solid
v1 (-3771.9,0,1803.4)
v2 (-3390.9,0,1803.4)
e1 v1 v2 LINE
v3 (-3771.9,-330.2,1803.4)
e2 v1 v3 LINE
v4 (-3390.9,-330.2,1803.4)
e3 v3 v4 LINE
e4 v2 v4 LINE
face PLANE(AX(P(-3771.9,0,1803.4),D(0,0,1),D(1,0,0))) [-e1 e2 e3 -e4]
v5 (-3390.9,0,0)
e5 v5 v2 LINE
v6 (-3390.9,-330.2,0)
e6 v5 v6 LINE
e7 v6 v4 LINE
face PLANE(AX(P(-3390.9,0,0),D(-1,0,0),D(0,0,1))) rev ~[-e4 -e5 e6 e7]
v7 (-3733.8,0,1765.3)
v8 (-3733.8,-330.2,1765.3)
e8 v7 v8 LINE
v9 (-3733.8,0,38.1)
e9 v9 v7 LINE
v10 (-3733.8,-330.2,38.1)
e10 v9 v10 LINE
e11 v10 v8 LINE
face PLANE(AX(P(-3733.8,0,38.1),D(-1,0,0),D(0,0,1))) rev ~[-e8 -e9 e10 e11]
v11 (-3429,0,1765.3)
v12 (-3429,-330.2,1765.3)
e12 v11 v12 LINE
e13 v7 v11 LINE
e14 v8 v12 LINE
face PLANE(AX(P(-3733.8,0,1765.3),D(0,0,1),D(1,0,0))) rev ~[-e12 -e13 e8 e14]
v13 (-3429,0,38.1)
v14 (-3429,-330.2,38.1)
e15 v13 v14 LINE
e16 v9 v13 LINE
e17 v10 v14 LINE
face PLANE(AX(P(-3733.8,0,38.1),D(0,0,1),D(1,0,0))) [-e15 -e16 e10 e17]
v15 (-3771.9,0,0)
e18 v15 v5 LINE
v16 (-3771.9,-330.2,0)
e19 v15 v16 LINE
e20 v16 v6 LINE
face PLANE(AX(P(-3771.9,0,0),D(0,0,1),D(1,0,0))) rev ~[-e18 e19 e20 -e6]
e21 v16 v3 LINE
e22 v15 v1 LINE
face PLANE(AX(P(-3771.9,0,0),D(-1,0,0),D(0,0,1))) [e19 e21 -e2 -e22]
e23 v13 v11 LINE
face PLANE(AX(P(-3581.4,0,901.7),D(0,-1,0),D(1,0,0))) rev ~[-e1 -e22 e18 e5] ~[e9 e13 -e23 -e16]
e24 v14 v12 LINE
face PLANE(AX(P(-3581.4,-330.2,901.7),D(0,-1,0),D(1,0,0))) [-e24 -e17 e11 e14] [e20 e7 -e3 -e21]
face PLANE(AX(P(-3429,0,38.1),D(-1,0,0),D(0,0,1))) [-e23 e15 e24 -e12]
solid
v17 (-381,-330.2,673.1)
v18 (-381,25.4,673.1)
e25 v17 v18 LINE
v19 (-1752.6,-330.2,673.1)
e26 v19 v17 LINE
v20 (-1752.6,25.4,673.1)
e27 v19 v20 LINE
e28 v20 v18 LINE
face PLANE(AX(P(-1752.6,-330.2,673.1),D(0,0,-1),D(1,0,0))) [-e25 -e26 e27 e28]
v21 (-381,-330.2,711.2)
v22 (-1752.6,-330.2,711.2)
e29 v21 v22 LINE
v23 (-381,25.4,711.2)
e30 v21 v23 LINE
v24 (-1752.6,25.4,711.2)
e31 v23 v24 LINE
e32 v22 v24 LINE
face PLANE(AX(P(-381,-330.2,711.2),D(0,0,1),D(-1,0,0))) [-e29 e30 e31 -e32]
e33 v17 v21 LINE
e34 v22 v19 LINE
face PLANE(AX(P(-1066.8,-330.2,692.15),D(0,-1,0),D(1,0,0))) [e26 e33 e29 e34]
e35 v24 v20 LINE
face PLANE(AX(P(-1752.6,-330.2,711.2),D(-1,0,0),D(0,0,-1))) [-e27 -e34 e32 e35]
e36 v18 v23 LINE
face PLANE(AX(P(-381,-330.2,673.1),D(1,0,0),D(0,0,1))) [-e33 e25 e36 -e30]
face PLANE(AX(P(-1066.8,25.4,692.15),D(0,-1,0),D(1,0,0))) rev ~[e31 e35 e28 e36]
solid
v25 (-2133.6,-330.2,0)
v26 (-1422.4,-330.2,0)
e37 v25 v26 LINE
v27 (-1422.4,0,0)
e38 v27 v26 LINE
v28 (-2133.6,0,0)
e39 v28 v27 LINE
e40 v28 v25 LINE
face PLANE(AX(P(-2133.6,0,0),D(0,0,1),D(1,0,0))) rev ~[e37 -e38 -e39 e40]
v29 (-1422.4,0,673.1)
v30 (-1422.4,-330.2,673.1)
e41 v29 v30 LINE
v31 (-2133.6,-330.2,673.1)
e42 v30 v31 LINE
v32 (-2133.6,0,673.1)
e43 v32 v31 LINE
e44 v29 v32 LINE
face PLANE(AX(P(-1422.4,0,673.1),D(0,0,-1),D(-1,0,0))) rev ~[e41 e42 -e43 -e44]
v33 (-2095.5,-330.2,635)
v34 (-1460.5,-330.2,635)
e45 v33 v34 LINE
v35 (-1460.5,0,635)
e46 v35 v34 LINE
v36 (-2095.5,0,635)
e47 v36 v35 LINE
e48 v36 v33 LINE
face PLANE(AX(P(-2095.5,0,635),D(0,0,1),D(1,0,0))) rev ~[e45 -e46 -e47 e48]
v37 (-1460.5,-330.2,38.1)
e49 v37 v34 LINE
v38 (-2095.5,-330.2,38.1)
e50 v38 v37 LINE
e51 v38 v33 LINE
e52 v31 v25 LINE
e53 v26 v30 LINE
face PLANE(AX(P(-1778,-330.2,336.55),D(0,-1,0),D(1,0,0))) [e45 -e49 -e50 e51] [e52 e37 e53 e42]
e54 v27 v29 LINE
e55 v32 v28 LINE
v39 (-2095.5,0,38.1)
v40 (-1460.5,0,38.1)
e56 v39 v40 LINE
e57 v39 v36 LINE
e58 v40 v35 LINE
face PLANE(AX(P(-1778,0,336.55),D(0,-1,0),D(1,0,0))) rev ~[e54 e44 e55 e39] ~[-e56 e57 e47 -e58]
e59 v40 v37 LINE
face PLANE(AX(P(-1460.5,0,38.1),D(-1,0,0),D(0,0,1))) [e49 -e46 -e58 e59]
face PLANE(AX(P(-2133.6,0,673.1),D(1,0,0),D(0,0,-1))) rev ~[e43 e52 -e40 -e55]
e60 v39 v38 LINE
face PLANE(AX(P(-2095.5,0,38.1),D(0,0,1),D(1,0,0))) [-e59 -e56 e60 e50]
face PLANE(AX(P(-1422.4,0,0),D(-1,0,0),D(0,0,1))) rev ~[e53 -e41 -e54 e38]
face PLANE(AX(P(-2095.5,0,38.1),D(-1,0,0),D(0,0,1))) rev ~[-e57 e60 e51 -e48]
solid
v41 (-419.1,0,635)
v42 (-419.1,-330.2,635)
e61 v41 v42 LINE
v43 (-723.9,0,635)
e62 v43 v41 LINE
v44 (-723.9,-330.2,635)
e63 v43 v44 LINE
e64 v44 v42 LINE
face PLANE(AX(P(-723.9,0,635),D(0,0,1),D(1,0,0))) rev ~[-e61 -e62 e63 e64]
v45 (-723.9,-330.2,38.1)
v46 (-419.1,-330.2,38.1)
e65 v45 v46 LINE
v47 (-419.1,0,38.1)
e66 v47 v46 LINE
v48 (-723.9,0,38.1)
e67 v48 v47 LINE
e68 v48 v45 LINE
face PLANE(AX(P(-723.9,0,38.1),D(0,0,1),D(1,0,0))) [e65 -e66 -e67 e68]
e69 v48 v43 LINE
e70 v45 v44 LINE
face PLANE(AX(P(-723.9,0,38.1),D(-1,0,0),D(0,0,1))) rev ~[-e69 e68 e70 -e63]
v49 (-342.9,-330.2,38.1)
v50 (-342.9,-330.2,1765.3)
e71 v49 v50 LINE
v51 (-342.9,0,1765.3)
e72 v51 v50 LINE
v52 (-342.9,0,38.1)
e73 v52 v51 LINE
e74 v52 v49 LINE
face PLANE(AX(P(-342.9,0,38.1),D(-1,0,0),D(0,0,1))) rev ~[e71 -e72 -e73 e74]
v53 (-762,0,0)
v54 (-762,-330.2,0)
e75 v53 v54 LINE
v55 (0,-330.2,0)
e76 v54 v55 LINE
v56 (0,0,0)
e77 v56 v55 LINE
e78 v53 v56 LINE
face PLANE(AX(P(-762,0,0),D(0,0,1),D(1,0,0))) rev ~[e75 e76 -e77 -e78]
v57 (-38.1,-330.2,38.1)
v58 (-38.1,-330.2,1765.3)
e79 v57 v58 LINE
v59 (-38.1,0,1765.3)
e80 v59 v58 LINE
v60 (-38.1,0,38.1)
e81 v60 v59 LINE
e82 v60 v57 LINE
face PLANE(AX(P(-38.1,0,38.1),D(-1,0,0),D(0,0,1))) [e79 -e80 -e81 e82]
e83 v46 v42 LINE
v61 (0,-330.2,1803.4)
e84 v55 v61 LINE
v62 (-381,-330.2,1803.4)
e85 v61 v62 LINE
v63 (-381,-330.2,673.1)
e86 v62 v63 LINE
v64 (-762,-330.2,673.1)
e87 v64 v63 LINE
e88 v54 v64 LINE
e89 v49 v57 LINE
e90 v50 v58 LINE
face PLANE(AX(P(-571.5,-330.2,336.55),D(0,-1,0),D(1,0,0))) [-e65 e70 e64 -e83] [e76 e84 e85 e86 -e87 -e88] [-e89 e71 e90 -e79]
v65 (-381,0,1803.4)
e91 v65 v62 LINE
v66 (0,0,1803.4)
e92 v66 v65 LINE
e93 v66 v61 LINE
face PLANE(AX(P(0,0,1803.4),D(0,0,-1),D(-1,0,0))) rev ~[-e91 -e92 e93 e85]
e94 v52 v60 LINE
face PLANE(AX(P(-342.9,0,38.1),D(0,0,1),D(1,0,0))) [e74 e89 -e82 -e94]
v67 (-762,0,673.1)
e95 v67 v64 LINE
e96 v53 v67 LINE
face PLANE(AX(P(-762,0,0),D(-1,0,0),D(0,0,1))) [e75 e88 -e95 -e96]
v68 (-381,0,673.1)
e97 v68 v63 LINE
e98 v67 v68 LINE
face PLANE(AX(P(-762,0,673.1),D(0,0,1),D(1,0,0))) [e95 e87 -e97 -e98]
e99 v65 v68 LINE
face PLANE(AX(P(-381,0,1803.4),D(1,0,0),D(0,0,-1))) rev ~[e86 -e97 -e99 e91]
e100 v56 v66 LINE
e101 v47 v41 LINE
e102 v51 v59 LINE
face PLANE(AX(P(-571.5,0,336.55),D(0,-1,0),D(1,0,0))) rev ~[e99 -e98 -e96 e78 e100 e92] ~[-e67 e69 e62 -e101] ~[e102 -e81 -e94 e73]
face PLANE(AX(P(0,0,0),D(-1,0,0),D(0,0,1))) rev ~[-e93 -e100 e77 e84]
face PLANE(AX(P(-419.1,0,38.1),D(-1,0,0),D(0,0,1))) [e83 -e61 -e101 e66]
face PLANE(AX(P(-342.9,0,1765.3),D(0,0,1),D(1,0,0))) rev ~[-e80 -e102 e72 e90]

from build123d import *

# Parameters (mm, degrees)
F0_W     = 381
F0_H     = 1803.4
F0_W_2   = 304.8
F0_H_2   = 1727.2
F1_DEPTH = 330.2
F0_W_3   = 635
F0_H_3   = 596.9
F0_H_4   = 673.1
F3_DEPTH = 355.6


# Not quite as in the source:
# - a feature names something its author has since deleted; it is built from what else it names


with BuildPart() as f1:
    # F0 (on Front) → F1 (new body)
    with BuildSketch(Plane.XZ):
        with Locations((-3581.4, 901.7)):
            Rectangle(F0_W, F0_H)
        with Locations((-3581.4, 901.7)):
            Rectangle(F0_W_2, F0_H_2, mode=Mode.SUBTRACT)
    extrude(amount=F1_DEPTH)


with BuildPart() as f1b:
    # F0 (on Front) → F1, piece 2 (new body)
    with BuildSketch(Plane.XZ):
        Polygon((-2133.6, 673.1), (-2133.6, 0), (-1752.6, 0), (-1422.4, 0), (-1422.4, 673.1), (-1752.6, 673.1), (-1790.7, 673.1), (-2095.5, 673.1), align=None)
        with Locations((-1778, 336.55)):
            Rectangle(F0_W_3, F0_H_3, mode=Mode.SUBTRACT)
    extrude(amount=F1_DEPTH)


with BuildPart() as f1c:
    # F0 (on Front) → F1, piece 3 (new body)
    with BuildSketch(Plane.XZ):
        with Locations((-571.5, 336.55)):
            Rectangle(F0_W, F0_H_4)
        with Locations((-571.5, 336.55)):
            Rectangle(F0_W_2, F0_H_3, mode=Mode.SUBTRACT)
        Polygon((-38.1, 0), (0, 0), (0, 1803.4), (-38.1, 1803.4), (-342.9, 1803.4), (-381, 1803.4), (-381, 673.1), (-381, 0), (-342.9, 0), align=None)
        with Locations((-190.5, 901.7)):
            Rectangle(F0_W_2, F0_H_2, mode=Mode.SUBTRACT)
    extrude(amount=F1_DEPTH)


with BuildPart() as f3:
    # F2 (on face) → F3 (new body)
    with BuildSketch(Plane.XZ.offset(330.2)):
        Polygon((-1752.6, 711.2), (-1752.6, 673.1), (-1422.4, 673.1), (-381, 673.1), (-381, 711.2), align=None)
    extrude(amount=-F3_DEPTH)


solid = Compound([f1.part, f1b.part, f1c.part, f3.part])
